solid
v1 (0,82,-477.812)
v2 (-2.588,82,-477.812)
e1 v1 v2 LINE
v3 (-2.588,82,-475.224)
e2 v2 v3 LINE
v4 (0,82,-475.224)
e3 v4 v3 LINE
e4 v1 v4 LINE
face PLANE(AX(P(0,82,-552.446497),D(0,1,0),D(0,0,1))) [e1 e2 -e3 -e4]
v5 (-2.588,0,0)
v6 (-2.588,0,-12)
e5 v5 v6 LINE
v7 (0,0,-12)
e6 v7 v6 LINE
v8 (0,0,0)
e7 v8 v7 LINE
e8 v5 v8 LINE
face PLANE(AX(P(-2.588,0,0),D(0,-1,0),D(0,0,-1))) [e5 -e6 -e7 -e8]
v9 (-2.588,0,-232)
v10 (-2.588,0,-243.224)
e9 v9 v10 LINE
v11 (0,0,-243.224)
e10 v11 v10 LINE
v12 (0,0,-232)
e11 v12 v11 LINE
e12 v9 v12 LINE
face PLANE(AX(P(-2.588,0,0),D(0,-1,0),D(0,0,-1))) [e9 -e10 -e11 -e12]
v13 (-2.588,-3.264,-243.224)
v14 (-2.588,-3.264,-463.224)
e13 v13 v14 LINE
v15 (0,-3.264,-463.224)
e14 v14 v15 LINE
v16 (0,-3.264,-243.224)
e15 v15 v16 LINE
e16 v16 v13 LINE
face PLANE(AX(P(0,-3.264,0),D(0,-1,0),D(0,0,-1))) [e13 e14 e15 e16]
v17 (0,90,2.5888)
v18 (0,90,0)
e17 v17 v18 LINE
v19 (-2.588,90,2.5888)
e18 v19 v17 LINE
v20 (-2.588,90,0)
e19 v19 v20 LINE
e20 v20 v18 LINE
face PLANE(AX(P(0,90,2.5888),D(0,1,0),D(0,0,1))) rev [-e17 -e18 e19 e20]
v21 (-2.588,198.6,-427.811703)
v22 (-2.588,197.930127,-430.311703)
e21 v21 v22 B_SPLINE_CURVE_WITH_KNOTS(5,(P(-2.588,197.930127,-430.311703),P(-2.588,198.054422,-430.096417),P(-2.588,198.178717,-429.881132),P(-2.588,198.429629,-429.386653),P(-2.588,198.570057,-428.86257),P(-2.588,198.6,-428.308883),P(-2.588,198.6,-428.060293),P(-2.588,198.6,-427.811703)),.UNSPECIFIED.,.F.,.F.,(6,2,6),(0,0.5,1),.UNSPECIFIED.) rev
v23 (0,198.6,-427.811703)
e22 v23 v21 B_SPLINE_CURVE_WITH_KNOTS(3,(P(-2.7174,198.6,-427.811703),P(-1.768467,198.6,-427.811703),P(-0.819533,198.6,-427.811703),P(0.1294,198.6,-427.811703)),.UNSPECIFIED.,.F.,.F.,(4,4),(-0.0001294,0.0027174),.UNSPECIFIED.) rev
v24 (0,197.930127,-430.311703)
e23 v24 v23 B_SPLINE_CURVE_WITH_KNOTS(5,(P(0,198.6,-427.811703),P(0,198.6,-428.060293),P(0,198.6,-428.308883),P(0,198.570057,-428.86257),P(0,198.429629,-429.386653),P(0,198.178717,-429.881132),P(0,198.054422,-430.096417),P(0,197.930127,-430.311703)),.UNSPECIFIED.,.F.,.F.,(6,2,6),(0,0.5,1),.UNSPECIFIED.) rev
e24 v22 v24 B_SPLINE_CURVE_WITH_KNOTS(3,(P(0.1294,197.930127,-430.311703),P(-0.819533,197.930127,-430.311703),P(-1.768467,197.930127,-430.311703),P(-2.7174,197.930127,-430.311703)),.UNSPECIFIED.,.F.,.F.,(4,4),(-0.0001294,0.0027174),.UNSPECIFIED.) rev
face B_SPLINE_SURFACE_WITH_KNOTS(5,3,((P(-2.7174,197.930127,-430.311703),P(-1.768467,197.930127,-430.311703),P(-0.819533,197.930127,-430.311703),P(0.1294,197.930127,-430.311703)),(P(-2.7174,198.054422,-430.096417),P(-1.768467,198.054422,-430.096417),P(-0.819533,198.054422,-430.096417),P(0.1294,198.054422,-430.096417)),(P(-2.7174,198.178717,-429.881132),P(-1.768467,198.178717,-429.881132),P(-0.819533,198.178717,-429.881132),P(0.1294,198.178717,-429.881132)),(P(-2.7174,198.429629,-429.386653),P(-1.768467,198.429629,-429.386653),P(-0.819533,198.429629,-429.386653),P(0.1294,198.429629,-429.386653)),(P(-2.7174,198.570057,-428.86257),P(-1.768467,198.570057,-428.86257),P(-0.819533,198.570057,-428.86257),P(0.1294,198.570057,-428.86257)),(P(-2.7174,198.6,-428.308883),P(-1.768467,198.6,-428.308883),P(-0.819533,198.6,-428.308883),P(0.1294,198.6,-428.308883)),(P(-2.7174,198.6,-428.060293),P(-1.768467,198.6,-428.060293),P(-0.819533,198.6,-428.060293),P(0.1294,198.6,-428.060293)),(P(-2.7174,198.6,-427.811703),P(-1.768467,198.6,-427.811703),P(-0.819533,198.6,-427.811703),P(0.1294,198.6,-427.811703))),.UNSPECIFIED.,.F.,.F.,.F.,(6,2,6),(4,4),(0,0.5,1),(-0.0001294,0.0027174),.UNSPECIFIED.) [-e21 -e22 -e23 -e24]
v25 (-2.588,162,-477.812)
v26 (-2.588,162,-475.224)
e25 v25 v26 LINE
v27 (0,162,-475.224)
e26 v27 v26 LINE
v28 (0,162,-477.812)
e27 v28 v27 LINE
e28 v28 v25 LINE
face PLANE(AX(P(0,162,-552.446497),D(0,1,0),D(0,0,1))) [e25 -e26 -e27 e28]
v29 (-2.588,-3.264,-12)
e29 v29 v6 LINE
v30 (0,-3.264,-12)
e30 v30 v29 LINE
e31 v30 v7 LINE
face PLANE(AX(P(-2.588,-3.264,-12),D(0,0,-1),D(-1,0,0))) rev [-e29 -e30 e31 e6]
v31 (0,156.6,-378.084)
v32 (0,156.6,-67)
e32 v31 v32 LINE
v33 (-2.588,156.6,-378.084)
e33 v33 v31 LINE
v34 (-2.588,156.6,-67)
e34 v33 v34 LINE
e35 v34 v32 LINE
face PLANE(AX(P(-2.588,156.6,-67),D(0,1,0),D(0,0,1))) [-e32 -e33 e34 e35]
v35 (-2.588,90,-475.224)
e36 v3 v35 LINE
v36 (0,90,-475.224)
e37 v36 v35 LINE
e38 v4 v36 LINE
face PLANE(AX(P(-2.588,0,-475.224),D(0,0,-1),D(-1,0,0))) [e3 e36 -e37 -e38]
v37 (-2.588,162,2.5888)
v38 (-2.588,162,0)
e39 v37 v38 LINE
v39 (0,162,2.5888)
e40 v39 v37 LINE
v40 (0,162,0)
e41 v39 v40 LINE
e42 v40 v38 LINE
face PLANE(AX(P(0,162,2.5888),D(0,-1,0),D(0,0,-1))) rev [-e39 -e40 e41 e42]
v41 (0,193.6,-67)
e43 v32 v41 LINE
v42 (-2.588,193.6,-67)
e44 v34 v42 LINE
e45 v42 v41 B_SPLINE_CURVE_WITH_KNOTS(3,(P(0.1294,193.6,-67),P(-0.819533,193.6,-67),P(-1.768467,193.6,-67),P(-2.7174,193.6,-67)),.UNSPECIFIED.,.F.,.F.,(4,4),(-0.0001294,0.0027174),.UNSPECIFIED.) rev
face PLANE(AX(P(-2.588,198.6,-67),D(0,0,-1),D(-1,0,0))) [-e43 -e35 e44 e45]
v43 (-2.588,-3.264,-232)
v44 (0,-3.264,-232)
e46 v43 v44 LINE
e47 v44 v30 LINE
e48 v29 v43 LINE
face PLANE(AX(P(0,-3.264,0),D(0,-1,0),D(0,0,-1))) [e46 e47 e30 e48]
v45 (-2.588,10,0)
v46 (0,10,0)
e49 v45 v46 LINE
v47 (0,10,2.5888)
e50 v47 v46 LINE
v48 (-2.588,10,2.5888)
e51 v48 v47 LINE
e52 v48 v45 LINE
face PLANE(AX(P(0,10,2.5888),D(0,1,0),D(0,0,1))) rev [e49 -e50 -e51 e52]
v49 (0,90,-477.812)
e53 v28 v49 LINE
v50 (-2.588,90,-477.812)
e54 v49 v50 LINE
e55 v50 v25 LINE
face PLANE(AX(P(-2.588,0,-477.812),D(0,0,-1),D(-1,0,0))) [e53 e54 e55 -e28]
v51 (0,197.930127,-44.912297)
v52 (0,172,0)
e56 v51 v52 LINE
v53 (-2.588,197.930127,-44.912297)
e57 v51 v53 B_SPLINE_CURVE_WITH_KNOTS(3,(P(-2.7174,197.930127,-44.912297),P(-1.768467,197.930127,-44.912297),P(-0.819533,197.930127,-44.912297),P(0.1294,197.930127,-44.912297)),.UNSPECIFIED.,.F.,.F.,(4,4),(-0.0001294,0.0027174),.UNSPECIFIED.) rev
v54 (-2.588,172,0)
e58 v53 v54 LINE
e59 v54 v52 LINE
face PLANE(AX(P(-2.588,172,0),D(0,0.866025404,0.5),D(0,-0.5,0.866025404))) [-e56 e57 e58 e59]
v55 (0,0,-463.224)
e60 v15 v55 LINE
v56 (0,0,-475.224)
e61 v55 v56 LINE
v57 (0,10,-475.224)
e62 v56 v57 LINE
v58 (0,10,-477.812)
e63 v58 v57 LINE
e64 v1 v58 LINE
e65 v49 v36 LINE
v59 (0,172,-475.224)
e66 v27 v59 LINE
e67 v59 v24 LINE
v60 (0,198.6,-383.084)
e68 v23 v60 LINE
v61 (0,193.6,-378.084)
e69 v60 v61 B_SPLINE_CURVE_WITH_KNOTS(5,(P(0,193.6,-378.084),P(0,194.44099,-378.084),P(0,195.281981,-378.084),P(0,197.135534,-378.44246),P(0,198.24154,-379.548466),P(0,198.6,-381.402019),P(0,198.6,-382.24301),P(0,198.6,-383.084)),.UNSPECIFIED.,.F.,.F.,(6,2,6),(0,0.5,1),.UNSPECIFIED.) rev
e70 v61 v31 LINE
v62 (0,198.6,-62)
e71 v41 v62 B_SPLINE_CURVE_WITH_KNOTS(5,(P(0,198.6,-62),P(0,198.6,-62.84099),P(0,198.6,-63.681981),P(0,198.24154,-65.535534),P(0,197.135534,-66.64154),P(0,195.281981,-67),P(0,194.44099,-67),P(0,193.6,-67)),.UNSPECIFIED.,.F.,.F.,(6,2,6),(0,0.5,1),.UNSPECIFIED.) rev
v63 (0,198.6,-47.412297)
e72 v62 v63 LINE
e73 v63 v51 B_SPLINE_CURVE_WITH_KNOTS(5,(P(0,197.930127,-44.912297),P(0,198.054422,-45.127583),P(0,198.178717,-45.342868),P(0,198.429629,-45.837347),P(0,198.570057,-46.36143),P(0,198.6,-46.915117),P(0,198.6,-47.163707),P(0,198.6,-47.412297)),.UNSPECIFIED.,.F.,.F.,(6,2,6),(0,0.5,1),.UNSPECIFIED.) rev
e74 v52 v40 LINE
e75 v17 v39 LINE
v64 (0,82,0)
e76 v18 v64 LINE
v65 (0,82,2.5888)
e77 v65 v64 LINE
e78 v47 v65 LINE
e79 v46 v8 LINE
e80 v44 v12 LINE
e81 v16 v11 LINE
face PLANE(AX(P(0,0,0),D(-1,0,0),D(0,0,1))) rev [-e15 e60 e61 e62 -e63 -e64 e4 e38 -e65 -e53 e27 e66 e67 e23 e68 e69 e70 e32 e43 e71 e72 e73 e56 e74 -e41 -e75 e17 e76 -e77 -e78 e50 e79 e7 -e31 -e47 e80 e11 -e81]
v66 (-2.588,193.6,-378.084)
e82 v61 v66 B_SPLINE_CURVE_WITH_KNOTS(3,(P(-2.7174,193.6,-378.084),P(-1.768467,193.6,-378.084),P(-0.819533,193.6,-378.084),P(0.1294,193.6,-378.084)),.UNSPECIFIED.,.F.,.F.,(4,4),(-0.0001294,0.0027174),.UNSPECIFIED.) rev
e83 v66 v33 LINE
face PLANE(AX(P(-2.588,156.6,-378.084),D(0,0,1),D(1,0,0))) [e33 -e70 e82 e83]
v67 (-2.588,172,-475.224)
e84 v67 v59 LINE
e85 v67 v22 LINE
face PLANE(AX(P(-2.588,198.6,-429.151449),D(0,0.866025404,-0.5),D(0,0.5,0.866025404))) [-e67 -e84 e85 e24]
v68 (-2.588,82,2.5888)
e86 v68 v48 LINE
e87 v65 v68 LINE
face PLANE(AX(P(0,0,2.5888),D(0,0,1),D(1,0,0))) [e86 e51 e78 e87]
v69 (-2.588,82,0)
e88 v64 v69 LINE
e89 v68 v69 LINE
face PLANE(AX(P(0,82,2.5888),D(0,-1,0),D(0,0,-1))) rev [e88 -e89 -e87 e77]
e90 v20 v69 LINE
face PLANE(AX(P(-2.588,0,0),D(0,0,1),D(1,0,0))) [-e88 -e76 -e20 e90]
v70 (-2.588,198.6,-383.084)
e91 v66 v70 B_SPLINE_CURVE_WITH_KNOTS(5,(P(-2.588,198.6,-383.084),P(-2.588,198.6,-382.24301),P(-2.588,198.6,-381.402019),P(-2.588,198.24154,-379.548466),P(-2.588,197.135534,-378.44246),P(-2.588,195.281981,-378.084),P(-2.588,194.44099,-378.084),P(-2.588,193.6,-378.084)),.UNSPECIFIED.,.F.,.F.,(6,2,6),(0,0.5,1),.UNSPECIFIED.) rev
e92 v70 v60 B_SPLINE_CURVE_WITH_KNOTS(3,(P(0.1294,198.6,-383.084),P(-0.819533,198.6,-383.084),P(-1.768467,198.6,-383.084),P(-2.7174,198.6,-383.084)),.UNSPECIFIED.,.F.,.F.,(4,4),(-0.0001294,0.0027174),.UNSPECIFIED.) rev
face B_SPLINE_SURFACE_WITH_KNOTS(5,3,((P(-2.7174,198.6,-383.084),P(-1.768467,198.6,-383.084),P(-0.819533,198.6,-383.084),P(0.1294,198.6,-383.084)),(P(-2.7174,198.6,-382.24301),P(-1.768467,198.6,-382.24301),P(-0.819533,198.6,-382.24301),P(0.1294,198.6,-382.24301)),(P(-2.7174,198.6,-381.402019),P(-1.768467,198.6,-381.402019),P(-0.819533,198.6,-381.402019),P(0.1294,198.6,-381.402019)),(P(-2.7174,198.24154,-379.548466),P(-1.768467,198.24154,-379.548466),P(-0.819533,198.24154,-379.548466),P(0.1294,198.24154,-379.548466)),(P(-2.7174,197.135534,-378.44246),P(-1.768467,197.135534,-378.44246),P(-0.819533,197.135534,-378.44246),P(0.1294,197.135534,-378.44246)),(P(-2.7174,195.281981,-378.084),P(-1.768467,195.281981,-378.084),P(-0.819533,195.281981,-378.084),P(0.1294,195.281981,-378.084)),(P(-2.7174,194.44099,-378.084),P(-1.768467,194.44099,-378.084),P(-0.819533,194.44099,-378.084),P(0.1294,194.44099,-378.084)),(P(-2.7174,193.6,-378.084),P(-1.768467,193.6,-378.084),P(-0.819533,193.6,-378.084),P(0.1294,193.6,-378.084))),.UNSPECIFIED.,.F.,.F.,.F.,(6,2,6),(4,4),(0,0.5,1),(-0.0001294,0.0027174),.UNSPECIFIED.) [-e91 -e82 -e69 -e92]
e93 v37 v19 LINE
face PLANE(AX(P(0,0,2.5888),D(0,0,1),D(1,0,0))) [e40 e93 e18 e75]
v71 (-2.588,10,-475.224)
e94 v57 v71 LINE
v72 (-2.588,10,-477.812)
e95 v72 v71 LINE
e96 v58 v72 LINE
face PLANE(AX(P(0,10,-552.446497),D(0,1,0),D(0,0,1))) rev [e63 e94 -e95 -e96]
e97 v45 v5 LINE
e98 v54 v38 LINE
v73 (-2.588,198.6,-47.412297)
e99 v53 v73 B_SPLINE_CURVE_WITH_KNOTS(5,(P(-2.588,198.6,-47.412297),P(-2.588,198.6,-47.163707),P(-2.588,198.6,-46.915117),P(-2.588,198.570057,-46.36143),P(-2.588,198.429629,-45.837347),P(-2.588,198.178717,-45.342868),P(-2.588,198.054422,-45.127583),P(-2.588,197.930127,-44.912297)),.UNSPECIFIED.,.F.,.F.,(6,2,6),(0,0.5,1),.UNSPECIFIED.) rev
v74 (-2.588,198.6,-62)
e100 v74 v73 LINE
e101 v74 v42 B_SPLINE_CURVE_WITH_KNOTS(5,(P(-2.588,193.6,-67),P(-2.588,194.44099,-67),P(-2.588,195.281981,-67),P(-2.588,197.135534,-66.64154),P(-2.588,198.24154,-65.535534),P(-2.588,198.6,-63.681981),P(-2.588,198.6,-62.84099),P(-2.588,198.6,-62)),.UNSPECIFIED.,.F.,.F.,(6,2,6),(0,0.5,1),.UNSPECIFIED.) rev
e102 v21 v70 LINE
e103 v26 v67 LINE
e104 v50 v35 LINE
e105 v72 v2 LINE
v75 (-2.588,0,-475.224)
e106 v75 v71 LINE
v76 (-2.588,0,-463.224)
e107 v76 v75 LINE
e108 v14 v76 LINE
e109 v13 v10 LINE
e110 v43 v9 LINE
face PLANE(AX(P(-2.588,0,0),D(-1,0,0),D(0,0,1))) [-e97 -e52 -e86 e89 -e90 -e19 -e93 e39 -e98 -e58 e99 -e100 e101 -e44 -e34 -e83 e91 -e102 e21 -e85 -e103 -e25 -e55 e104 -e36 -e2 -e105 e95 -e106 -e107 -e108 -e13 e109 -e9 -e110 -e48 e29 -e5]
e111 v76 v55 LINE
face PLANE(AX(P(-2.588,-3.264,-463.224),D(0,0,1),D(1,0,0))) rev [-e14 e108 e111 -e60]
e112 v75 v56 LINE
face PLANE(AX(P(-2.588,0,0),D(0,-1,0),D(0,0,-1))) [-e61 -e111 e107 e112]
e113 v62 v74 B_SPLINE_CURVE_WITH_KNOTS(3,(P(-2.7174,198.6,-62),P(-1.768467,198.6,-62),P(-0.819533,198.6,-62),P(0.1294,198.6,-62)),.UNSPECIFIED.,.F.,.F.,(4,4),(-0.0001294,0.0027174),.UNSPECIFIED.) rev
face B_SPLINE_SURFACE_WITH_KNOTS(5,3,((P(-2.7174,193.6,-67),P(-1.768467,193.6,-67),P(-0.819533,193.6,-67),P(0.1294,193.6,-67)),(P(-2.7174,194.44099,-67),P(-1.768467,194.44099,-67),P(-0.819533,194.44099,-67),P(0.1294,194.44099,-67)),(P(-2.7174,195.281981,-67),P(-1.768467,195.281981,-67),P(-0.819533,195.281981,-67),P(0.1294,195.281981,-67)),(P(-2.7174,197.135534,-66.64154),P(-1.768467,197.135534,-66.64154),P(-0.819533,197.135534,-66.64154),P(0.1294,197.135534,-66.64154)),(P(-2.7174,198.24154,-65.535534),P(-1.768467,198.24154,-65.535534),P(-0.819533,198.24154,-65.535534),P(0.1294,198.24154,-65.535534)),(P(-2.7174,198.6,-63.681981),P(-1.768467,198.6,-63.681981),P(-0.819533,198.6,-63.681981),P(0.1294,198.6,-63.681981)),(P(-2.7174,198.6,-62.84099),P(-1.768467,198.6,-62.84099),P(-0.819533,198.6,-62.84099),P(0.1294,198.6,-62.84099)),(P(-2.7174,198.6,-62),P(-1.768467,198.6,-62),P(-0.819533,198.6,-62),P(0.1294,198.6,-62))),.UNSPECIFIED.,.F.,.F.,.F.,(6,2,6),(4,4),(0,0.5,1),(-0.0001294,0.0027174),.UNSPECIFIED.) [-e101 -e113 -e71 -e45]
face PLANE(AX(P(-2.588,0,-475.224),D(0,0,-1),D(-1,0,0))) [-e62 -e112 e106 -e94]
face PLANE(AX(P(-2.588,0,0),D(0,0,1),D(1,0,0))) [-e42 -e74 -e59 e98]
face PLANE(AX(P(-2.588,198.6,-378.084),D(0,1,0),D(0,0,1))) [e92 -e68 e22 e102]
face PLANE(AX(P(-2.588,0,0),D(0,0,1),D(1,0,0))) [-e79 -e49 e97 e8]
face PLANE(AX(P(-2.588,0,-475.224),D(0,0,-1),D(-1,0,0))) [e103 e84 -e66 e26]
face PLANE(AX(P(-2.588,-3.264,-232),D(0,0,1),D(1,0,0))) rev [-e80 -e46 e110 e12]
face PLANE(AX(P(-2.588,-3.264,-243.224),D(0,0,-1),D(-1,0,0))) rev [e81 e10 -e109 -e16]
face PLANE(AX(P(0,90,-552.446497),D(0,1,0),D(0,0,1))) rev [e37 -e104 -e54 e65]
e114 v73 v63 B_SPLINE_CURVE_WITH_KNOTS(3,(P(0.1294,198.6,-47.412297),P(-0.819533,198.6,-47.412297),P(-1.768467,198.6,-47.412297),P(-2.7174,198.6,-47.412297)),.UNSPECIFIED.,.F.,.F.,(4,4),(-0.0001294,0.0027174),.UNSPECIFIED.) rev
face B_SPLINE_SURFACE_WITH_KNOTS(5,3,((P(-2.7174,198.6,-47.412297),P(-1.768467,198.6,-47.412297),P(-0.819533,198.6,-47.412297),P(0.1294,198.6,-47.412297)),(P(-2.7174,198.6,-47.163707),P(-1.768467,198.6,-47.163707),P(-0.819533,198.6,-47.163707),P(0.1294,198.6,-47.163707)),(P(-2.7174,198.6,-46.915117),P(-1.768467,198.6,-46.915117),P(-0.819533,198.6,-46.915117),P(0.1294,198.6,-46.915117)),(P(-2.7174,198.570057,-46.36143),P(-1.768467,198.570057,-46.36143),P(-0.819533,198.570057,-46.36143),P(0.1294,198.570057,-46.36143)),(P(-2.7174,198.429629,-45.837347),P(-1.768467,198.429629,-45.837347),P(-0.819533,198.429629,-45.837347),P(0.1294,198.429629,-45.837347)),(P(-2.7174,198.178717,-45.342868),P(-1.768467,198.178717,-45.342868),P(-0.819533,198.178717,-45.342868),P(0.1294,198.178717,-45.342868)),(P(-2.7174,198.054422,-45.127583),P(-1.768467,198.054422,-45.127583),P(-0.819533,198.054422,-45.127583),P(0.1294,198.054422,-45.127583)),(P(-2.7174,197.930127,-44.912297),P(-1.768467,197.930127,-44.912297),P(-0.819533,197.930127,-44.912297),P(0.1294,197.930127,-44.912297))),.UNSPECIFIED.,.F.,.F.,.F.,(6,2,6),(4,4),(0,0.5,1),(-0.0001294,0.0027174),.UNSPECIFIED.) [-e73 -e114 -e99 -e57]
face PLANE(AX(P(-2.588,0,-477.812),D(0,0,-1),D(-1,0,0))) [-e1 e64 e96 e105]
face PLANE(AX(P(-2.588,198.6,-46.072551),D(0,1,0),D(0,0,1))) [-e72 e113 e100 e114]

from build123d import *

# Parameters (mm, degrees)
BASE_FLANGE1_DEPTH  = 2.588
SKETCH2_W           = 2.588
SKETCH2_H           = 72
BOSS_EXTRUDE1_DEPTH = 2.588
SKETCH3_W           = 2.588
SKETCH3_H           = 220
BOSS_EXTRUDE2_DEPTH = 3.264
SKETCH4_W           = 2.588
SKETCH4_H           = 72
BOSS_EXTRUDE3_DEPTH = 2.5888
FILLET1_SIZE        = 5


# Sheet-metal steps are written as plain solids
with BuildPart() as part:
    # Base-Flange1: sheet metal written as solids
    # Sketch1 → Base-Flange1 (new body)
    with BuildSketch(Plane(origin=(0, 0, 0), x_dir=(0, 0, -1), z_dir=(1, 0, 0))):
        Polygon((0, 172), (46.072551481, 198.6), (67, 198.6), (67, 156.6), (378.084, 156.6), (378.084, 198.6), (429.151448519, 198.6), (475.224, 172), (475.224, 0), (0, 0), align=None)
    extrude(amount=-BASE_FLANGE1_DEPTH)

    # Sketch2 → Boss-Extrude1 (add)
    with BuildSketch(Plane(origin=(0, 0, -475.224), x_dir=(-1, 0, 0), z_dir=(0, 0, -1))):
        with Locations((1.294, 126)):
            Rectangle(SKETCH2_W, SKETCH2_H)
        with Locations((1.294, 46)):
            Rectangle(SKETCH2_W, SKETCH2_H)
    extrude(amount=BOSS_EXTRUDE1_DEPTH)

    # Sketch3 → Boss-Extrude2 (add)
    with BuildSketch(Plane.XZ):
        with Locations((-1.294, -122)):
            Rectangle(SKETCH3_W, SKETCH3_H)
        with Locations((-1.294, -353.224)):
            Rectangle(SKETCH3_W, SKETCH3_H)
    extrude(amount=BOSS_EXTRUDE2_DEPTH)

    # Sketch4 → Boss-Extrude3 (add)
    with BuildSketch(Plane.XY):
        with Locations((-1.294, 126)):
            Rectangle(SKETCH4_W, SKETCH4_H)
        with Locations((-1.294, 46)):
            Rectangle(SKETCH4_W, SKETCH4_H)
    extrude(amount=BOSS_EXTRUDE3_DEPTH)

    # Fillet1
    # a fillet whose section is not a circle: 5 mm, written as the material it takes off along each edge
    with BuildSketch(Plane(origin=(12.5, 198.6, -378.084), x_dir=(0, -1, 0), z_dir=(-1, 0, 0)), Plane(origin=(12.5, 198.6, -67), x_dir=(0, 0, 1), z_dir=(-1, 0, 0))) as fillet1_piece_1:
        with BuildLine():
            add(Edge.make_bspline([(FILLET1_SIZE, 0), (4.159009742, 0), (3.318019485, 0), (1.464466094, -0.358459599), (0.358459599, -1.464466094), (0, -3.318019485), (0, -4.159009742), (0, -FILLET1_SIZE)], knots=[0, 0, 0, 0, 0, 0, 0.5, 0.5, 1, 1, 1, 1, 1, 1], degree=5))
            Line((0, -FILLET1_SIZE), (0, 0))
            Line((0, 0), (FILLET1_SIZE, 0))
        make_face()
    extrude(amount=27.588, mode=Mode.SUBTRACT)
    with BuildSketch(Plane(origin=(3.349364905, 198.6, -429.151448519), x_dir=(0, 0, 1), z_dir=(-1, 0, 0)), Plane(origin=(3.349364905, 198.6, -46.072551481), x_dir=(0, -0.49999999999999534, 0.8660254037844413), z_dir=(-1, 0, 0))) as fillet1_piece_2:
        with BuildLine():
            add(Edge.make_bspline([(1.339745962, 0), (1.091155955, 0), (0.842565948, 0), (0.288878575, -0.029943211), (-0.235204579, -0.170370869), (-0.729683516, -0.421282974), (-0.944968777, -0.545577978), (-1.160254038, -0.669872981)], knots=[0, 0, 0, 0, 0, 0, 0.5, 0.5, 1, 1, 1, 1, 1, 1], degree=5))
            Line((-1.160254038, -0.669872981), (0, 0))
            Line((0, 0), (1.339745962, 0))
        make_face()
    extrude(amount=9.286729811, mode=Mode.SUBTRACT)


solid = part.part
